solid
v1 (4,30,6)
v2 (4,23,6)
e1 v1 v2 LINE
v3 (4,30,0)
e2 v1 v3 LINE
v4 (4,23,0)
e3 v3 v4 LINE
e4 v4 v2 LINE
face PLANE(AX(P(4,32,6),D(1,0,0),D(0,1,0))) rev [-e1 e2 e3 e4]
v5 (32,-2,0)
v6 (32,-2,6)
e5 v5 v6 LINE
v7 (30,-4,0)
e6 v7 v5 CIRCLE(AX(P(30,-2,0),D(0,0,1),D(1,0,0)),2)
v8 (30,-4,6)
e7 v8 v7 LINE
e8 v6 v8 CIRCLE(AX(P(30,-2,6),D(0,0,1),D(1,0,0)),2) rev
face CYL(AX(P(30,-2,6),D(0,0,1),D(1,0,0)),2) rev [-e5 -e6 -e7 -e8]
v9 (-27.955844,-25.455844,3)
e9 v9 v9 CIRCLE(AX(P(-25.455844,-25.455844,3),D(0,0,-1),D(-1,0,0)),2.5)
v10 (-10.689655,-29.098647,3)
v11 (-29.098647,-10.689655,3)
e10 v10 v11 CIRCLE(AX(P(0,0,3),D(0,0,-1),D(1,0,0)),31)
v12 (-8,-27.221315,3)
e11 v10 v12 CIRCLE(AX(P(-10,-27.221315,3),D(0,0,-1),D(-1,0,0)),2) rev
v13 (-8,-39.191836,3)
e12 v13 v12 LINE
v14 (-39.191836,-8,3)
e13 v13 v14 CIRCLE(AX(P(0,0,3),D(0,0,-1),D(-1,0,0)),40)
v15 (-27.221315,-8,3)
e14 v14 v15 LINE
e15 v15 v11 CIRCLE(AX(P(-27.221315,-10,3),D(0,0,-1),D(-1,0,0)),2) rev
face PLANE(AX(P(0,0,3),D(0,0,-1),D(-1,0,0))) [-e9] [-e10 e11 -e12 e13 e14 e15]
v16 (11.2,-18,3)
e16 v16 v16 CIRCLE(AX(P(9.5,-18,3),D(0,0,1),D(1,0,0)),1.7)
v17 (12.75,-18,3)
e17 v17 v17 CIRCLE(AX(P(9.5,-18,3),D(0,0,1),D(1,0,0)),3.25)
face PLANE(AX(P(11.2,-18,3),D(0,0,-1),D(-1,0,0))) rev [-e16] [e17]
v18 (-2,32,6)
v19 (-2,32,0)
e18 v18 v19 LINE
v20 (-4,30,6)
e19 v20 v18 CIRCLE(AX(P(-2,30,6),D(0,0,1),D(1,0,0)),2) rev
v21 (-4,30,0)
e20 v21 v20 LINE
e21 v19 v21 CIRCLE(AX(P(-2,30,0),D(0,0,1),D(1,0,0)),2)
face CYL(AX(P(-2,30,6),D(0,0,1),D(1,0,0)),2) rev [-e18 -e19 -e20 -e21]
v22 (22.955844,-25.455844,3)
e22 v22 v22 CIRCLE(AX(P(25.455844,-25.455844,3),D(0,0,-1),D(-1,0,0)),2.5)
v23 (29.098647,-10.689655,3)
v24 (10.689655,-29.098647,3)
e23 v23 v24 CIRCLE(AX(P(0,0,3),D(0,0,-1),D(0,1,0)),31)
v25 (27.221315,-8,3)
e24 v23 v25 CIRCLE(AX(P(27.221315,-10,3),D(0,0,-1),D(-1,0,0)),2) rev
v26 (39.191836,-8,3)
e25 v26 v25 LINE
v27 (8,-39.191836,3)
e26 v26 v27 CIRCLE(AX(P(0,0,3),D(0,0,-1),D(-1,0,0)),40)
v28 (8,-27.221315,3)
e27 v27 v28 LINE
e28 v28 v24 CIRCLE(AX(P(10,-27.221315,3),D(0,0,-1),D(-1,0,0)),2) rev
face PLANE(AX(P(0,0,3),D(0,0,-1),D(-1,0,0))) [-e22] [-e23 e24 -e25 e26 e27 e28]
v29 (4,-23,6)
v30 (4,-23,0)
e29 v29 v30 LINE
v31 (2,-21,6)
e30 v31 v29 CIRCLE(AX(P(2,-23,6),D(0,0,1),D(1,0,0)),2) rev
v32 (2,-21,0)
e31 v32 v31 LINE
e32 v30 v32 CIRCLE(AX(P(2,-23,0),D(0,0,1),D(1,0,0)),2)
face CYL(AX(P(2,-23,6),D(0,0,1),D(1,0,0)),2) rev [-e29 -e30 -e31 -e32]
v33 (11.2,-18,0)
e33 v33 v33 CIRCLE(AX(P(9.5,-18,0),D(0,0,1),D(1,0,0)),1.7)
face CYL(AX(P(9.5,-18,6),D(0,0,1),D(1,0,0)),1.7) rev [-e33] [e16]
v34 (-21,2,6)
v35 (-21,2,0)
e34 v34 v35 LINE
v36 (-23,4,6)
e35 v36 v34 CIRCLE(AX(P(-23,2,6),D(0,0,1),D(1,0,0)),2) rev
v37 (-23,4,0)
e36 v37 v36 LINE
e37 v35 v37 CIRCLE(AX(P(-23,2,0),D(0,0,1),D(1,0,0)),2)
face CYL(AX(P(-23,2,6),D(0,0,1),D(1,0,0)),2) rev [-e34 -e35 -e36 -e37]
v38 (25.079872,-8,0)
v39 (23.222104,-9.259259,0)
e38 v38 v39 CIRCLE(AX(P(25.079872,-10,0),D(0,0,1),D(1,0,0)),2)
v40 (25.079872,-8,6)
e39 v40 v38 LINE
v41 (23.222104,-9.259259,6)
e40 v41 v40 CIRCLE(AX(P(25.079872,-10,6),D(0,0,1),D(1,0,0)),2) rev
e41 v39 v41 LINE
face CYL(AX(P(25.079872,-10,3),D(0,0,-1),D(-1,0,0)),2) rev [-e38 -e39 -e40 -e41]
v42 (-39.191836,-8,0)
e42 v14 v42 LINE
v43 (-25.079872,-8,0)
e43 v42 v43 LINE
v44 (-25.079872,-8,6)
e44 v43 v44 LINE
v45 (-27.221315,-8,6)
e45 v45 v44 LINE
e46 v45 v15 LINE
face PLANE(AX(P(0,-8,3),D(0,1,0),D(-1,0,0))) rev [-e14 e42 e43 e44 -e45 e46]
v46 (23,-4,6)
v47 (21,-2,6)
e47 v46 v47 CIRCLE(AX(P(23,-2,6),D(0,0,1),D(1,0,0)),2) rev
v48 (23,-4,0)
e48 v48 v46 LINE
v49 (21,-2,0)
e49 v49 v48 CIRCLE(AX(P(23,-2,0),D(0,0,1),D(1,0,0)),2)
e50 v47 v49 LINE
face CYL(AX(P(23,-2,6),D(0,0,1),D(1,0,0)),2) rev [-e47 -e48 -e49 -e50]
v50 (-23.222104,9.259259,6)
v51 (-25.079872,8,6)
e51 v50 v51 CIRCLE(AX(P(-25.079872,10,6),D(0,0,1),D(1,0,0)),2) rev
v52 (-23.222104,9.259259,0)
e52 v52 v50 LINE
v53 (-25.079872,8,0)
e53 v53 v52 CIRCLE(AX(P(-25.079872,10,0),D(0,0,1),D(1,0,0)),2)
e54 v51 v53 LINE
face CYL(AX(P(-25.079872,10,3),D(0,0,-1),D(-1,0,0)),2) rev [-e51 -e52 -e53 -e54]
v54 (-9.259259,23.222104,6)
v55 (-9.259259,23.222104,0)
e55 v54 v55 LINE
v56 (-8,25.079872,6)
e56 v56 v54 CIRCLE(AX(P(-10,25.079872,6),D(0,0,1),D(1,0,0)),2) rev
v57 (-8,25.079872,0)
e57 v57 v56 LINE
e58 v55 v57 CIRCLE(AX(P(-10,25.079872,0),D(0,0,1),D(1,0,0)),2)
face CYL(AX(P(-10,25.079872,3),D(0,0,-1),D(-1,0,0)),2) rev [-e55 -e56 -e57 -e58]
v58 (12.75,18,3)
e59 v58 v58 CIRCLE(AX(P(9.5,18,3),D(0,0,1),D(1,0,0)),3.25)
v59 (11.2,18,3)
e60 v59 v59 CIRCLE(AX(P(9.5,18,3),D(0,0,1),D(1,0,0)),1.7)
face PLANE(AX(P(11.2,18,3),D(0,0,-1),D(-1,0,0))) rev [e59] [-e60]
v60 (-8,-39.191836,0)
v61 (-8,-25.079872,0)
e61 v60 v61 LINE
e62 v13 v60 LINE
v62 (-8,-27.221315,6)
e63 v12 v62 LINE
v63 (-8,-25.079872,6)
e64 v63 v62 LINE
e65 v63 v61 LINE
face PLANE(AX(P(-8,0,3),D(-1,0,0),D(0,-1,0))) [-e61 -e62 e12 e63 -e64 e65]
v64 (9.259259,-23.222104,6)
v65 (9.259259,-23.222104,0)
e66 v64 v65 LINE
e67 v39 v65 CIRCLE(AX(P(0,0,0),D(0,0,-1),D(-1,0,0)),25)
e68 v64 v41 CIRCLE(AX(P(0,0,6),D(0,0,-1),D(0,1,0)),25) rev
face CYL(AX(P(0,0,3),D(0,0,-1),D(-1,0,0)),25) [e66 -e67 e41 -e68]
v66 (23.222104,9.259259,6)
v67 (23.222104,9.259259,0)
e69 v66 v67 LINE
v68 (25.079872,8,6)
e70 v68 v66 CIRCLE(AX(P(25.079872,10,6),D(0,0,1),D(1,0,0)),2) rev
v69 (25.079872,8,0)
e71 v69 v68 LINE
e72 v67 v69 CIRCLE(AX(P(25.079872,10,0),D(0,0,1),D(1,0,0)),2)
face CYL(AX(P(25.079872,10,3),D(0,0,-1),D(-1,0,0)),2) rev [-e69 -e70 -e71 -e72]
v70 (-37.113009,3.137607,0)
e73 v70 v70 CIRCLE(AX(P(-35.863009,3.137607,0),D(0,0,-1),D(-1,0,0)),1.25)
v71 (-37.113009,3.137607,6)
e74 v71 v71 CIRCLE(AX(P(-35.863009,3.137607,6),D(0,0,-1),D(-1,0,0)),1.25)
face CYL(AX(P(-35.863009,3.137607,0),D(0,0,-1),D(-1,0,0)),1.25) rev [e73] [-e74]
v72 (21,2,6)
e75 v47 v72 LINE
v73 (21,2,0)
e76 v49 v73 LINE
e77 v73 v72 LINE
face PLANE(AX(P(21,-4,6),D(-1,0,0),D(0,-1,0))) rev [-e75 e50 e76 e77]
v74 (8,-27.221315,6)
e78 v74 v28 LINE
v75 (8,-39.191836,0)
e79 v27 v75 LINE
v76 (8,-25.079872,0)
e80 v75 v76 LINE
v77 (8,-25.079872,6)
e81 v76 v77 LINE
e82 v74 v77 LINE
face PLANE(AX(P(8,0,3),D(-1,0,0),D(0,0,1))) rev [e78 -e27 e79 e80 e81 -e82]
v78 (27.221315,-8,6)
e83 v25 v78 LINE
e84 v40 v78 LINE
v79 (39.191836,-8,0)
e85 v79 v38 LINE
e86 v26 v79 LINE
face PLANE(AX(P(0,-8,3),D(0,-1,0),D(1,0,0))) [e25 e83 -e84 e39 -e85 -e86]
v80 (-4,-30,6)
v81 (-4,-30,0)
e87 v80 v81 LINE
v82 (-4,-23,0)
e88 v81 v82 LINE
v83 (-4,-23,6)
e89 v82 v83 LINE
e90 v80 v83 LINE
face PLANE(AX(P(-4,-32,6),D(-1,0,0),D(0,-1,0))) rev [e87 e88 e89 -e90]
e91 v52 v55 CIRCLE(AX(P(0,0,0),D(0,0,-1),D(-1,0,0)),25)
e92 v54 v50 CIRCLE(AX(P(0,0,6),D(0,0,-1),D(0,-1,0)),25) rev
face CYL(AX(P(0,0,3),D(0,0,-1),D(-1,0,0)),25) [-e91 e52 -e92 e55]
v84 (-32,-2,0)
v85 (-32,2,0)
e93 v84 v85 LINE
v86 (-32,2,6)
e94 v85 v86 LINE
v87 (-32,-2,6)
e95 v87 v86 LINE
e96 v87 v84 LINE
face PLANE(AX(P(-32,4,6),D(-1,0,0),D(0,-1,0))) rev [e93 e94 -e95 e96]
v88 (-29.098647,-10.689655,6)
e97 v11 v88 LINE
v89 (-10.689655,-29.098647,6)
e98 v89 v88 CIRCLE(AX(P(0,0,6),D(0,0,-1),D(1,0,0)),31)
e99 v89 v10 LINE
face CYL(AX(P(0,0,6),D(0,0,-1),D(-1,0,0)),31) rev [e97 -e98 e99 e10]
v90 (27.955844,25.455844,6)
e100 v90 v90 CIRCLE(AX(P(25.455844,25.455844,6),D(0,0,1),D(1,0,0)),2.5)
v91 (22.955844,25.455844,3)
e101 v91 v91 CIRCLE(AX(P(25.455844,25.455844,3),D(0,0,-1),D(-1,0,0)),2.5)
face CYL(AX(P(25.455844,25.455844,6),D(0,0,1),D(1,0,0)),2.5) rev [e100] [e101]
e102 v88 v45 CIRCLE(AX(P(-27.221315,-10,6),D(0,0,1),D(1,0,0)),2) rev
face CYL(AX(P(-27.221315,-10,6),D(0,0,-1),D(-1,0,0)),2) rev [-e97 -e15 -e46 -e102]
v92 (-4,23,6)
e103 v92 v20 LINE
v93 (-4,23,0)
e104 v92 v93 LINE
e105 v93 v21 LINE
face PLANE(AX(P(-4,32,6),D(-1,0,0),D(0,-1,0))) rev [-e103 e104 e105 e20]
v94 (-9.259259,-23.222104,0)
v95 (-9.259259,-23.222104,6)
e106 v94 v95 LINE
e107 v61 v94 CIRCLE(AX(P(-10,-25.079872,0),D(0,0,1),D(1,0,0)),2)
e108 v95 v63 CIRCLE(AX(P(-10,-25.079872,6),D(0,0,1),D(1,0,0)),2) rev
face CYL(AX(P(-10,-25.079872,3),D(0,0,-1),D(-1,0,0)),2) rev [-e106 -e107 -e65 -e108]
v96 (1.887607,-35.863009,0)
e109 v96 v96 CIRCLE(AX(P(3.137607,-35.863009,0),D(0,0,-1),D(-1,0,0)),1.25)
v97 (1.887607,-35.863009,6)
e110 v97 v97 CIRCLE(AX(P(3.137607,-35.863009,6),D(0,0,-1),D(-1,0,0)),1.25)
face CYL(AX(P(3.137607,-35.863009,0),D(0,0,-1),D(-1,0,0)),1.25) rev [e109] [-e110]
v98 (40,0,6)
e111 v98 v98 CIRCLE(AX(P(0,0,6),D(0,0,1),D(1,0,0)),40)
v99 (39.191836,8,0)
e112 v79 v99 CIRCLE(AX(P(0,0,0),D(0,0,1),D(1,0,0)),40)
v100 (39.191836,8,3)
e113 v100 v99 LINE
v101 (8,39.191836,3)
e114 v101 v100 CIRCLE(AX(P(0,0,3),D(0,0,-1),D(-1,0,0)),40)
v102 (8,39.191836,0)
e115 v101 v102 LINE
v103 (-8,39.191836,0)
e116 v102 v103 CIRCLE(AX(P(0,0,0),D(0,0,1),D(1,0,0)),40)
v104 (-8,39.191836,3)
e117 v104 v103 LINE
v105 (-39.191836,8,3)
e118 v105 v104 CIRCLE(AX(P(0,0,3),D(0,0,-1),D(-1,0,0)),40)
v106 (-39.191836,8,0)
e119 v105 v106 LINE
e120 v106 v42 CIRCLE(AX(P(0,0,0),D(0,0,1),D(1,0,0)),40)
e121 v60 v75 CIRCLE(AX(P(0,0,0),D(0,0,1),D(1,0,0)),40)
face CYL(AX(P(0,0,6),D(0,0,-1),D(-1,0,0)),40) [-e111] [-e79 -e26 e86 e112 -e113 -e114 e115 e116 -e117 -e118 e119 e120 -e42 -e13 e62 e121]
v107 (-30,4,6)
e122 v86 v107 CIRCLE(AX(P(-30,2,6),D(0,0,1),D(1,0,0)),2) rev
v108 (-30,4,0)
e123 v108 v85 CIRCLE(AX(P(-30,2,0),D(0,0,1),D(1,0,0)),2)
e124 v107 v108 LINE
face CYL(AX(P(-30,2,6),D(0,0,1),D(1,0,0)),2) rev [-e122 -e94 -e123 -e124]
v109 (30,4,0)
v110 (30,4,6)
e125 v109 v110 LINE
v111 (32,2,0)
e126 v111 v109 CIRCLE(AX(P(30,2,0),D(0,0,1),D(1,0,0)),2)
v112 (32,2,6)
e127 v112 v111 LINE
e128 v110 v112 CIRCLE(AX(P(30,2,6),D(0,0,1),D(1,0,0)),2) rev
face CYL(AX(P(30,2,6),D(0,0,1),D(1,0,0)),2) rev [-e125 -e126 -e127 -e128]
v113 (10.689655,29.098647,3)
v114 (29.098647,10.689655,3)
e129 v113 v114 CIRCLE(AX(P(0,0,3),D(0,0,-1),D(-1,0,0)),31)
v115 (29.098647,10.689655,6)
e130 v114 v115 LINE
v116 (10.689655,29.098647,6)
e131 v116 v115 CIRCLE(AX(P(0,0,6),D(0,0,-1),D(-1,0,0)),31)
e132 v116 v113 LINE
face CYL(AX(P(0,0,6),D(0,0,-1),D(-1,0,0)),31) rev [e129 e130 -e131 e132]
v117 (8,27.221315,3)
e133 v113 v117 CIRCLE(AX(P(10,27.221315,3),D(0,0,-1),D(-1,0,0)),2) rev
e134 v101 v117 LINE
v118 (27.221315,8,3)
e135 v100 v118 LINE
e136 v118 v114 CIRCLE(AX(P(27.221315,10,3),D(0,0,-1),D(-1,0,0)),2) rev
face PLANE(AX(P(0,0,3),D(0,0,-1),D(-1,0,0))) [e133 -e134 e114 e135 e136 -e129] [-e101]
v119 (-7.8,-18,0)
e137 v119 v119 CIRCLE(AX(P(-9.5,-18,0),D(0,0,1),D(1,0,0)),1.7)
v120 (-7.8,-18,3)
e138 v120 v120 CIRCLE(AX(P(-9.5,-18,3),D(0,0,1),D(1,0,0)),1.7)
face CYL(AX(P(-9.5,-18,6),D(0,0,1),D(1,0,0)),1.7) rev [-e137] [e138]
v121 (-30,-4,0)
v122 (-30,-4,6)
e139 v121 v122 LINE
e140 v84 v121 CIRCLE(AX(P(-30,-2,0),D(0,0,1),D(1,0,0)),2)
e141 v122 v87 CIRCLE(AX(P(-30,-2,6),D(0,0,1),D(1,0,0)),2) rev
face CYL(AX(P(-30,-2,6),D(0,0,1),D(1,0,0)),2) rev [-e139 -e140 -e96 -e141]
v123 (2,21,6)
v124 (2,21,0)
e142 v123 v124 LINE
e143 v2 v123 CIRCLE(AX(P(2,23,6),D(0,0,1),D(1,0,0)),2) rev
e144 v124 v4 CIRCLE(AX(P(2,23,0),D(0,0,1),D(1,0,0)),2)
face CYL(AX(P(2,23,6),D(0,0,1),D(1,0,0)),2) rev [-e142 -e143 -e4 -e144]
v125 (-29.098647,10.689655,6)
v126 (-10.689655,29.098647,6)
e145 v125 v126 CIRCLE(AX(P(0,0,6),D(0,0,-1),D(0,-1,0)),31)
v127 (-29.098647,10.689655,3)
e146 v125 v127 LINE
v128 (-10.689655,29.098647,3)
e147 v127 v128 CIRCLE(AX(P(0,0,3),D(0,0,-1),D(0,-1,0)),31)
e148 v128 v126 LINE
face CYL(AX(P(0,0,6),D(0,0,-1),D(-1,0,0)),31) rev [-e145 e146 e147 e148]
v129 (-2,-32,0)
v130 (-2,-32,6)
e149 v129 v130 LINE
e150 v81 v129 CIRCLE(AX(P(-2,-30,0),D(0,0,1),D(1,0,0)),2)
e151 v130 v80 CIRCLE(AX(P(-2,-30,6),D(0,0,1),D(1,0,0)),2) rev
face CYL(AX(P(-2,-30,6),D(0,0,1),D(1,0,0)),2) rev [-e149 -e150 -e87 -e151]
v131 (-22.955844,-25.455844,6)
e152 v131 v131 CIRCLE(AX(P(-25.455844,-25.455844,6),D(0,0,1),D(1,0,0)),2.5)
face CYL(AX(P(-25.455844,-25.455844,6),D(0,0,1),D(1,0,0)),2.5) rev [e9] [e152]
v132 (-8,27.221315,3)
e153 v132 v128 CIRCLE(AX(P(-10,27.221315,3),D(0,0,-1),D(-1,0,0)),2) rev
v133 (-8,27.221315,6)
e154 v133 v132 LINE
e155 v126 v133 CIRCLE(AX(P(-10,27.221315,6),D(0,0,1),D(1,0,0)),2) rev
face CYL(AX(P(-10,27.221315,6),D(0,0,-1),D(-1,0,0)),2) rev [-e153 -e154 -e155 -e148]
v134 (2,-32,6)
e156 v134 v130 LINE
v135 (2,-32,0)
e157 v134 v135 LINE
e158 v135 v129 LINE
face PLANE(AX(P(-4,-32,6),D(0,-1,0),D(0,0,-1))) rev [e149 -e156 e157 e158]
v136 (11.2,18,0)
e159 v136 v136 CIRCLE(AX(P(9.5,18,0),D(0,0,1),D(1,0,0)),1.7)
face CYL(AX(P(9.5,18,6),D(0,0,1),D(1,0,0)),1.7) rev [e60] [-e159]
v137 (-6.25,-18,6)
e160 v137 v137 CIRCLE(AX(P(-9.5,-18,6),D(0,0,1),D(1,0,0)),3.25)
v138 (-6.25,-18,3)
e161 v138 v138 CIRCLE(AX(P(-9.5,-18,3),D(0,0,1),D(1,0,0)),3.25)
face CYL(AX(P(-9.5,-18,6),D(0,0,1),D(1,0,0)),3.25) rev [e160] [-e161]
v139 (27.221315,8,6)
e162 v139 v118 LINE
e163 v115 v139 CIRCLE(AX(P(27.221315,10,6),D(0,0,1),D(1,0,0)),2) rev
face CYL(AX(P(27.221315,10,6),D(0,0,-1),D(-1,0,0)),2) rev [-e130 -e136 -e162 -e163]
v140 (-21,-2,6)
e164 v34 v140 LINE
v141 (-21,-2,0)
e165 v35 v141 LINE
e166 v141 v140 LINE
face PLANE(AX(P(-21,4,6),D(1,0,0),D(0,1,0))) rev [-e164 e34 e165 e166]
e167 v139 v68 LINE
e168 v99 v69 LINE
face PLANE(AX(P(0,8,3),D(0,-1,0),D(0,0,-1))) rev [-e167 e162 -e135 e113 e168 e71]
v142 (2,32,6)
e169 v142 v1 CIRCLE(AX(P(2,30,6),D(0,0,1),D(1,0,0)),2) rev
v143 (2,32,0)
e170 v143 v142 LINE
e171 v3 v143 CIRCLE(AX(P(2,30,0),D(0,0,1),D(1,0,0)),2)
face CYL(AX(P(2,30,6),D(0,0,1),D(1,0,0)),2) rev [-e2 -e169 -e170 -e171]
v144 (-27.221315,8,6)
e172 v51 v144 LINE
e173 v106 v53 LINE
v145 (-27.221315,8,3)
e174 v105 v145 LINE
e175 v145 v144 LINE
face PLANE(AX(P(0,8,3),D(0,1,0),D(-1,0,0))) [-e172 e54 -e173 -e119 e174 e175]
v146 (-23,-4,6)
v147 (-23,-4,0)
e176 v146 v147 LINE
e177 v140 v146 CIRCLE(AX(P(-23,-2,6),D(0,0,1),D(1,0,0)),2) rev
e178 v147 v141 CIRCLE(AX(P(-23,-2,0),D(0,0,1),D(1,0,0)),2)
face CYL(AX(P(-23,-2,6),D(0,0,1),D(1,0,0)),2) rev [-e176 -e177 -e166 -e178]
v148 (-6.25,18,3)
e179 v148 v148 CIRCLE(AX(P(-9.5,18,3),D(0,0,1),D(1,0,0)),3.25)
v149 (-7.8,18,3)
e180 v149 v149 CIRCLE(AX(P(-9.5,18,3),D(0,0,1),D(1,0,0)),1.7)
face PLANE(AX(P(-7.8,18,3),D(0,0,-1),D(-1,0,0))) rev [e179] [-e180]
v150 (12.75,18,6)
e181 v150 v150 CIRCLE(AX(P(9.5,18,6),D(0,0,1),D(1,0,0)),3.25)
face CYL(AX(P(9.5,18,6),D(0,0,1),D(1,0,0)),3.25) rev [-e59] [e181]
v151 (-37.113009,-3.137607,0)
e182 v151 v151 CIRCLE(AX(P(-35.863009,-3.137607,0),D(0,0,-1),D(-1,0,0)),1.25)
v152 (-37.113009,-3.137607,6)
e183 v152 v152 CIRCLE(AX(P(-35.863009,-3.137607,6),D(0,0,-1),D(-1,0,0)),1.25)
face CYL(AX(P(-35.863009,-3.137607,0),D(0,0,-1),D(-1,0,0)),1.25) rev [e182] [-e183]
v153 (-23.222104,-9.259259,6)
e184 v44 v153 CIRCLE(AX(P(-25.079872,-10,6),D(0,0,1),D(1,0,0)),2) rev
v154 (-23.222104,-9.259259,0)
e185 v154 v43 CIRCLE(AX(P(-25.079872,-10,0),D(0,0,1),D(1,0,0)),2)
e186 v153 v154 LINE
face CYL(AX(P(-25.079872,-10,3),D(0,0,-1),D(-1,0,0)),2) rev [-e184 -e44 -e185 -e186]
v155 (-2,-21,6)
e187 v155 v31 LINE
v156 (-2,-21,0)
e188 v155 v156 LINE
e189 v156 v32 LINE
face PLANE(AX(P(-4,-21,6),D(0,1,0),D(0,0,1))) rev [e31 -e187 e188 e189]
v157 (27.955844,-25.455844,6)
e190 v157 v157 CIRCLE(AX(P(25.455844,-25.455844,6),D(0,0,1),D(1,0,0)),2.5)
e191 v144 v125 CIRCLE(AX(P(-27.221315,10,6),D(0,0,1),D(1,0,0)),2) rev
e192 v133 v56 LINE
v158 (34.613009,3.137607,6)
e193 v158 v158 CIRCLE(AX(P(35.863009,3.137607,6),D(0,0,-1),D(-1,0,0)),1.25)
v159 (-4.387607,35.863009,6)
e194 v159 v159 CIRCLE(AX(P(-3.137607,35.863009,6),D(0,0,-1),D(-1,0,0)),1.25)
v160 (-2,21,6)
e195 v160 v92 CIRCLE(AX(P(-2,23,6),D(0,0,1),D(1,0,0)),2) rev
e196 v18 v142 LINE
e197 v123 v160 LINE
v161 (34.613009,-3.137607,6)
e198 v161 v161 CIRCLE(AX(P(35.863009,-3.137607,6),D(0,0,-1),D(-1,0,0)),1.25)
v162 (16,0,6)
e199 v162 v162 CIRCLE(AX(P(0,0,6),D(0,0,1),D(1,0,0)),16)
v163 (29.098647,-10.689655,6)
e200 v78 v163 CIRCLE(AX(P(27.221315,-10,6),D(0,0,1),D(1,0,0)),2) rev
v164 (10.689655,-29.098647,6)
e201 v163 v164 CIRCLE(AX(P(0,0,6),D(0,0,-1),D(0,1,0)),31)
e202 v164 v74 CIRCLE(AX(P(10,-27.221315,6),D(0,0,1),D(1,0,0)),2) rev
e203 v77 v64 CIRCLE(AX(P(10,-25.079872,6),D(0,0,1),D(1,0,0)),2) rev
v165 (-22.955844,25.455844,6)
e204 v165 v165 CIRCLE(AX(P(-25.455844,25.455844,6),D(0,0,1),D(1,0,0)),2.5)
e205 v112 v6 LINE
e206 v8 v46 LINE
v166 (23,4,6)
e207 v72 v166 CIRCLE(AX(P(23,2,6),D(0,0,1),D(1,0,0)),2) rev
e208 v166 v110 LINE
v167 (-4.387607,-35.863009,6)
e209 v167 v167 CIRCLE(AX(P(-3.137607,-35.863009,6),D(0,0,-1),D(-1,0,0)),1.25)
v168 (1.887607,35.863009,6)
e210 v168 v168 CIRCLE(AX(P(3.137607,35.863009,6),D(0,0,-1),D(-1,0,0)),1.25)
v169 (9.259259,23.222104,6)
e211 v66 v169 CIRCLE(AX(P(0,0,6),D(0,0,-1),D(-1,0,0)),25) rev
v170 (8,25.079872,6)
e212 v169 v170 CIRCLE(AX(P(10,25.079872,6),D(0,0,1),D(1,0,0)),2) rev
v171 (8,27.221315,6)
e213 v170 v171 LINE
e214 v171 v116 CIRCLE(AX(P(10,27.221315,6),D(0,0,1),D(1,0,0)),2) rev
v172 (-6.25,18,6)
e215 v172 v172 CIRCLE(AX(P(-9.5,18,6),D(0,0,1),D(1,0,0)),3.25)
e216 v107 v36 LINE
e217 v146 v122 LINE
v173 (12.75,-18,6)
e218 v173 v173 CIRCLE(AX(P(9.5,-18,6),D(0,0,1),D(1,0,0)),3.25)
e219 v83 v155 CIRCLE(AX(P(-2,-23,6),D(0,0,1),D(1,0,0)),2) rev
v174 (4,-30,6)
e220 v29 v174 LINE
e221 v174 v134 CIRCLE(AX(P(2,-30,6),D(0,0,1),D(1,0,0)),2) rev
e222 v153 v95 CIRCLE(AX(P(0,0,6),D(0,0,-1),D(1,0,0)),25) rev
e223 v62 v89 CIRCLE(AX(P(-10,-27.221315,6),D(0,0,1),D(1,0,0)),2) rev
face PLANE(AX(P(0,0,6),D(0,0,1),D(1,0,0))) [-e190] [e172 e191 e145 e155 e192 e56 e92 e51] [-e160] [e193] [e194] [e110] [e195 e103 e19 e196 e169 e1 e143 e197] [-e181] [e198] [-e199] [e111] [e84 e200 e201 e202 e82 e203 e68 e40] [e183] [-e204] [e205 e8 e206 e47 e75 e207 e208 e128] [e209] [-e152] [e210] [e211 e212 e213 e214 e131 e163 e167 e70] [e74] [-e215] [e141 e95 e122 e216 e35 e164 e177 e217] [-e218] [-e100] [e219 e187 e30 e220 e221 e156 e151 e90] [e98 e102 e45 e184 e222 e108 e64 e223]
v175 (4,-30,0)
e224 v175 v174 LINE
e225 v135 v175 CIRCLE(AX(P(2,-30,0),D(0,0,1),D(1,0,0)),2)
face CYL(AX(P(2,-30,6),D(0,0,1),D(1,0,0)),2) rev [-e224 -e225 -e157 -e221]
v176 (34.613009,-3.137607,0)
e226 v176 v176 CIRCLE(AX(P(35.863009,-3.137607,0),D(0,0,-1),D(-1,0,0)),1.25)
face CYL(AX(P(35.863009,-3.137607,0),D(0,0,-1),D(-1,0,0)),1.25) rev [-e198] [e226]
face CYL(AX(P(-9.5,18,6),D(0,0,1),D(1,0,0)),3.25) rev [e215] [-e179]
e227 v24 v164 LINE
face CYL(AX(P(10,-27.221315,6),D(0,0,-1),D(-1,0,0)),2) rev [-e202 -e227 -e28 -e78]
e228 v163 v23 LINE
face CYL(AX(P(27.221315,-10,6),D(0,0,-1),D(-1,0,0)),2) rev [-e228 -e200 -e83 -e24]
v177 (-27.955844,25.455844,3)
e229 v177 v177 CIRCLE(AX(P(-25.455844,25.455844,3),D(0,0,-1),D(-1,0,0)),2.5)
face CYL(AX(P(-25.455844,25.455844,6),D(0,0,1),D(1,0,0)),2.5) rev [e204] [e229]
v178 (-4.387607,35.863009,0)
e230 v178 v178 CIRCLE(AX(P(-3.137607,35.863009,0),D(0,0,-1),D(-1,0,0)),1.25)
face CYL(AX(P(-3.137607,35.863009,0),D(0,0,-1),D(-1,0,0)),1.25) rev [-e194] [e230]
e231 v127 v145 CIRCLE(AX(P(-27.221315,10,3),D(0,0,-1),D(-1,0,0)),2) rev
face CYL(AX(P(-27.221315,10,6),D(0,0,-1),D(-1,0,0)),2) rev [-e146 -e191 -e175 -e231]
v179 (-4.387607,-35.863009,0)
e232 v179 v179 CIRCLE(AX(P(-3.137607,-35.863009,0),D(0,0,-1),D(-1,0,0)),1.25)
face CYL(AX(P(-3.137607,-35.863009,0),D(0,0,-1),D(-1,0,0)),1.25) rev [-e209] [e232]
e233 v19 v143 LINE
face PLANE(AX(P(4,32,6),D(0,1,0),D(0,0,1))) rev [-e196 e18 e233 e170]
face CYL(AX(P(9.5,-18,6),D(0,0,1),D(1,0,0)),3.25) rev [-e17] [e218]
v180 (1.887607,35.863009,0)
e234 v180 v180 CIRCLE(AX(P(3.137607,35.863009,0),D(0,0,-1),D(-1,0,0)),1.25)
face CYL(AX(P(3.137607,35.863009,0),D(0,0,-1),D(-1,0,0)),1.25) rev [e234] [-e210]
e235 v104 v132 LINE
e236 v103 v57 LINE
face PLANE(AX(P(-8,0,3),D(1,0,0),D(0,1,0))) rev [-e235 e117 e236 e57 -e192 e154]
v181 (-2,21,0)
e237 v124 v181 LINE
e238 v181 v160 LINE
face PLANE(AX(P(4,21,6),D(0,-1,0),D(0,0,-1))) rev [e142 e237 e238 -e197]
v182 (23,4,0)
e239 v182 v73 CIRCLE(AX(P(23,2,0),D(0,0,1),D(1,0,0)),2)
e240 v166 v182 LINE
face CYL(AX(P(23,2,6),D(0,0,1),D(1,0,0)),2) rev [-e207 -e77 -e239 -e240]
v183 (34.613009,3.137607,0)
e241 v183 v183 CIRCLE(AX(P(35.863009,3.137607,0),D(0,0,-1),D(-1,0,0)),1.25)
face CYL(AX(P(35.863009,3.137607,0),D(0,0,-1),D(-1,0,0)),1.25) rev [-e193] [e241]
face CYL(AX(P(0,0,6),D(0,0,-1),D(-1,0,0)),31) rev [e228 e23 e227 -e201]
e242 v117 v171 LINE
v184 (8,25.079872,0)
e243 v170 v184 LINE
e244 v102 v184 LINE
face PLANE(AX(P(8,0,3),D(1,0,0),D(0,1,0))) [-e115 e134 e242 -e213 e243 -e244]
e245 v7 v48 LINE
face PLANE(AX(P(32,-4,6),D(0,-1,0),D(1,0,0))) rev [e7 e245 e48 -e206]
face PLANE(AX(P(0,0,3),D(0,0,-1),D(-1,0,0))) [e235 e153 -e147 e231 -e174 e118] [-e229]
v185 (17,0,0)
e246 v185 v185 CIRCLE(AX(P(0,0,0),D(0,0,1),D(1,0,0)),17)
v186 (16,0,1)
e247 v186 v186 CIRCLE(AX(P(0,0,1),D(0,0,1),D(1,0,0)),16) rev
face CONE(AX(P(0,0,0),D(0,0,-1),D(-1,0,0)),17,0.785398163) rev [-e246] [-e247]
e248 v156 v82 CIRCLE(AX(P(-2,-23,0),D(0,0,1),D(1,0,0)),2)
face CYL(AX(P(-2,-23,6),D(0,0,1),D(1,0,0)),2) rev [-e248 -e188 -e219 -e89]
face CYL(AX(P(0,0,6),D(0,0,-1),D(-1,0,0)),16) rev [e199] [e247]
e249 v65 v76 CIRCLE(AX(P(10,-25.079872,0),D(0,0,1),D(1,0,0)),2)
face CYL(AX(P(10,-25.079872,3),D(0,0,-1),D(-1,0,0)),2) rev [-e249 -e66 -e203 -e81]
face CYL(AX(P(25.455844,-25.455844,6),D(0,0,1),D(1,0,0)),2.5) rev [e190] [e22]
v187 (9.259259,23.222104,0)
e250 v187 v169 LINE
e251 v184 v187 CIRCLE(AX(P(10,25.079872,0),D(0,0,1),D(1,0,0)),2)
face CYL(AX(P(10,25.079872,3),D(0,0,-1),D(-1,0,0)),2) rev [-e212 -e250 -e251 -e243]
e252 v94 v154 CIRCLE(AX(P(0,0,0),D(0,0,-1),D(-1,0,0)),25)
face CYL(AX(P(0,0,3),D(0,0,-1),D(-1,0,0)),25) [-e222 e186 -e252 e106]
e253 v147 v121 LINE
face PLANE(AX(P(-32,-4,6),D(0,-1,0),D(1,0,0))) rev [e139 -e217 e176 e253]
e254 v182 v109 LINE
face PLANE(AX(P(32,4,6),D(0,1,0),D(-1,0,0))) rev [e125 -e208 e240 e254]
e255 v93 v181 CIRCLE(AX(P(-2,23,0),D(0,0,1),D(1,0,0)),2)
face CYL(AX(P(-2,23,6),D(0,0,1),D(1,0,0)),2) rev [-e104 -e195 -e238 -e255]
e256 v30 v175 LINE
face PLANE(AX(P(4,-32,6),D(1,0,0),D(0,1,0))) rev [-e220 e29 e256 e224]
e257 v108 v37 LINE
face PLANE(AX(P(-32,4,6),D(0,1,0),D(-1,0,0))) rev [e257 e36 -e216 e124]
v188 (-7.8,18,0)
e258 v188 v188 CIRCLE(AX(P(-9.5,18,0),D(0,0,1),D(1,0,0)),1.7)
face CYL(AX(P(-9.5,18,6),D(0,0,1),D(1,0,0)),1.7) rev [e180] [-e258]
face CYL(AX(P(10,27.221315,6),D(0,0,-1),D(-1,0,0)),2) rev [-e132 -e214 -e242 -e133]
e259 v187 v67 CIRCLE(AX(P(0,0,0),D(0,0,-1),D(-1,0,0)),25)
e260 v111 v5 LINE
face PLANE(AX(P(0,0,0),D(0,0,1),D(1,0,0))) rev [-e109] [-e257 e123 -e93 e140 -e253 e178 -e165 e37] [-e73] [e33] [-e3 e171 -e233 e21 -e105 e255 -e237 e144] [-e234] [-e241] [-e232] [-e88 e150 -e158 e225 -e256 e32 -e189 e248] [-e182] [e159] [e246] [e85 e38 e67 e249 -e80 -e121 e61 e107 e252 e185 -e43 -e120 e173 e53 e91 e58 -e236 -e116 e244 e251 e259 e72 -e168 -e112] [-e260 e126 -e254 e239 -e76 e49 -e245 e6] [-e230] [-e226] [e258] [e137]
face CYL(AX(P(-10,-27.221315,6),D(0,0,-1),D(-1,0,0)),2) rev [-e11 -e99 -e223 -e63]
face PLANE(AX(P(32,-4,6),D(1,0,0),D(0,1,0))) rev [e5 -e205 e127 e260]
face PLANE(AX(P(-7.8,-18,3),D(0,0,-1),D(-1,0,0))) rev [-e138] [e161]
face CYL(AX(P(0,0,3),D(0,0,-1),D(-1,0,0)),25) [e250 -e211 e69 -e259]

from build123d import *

# Parameters (mm, degrees)
SKETCH2_R             = 40
SKETCH2_R_2           = 16
BOSS_EXTRUDE1_DEPTH   = 6
CUT_EXTRUDE1_DEPTH    = 3
M3X0_5_TAPPED_HOLE1_D = 2.5
CIRPATTERN1_COUNT     = 4
CHAMFER1_SIZE         = 1
HOLE1_D               = 3.4
HOLE1_CBORE_D         = 6.5
HOLE1_CBORE_DEPTH     = 3
CUT_EXTRUDE2_DEPTH    = 57.648036153
SKETCH11_W            = 8
SKETCH11_H            = 11
CUT_EXTRUDE3_DEPTH    = 57.885850613
FILLET1_R             = 2
FILLET2_R             = 2
CIRPATTERN2_DEPTH     = 6
M4_CLEARANCE_HOLE1_D  = 5
CIRPATTERN3_COUNT     = 4
FILLET3_R             = 2


# Read off the part's stored shape, not the designer's step: CirPattern2
with BuildPart() as part:
    # Sketch2 → Boss-Extrude1 (new body)
    with BuildSketch(Plane.XY):
        Circle(SKETCH2_R)
        Circle(SKETCH2_R_2, mode=Mode.SUBTRACT)
    extrude(amount=BOSS_EXTRUDE1_DEPTH)

    # Sketch3 → Cut-Extrude1 (cut)
    with BuildSketch(Plane(origin=(0, 0, 0), x_dir=(-1, 0, 0), z_dir=(0, 0, -1))):
        with BuildLine():
            Line((-8, 23.685438565), (-8, 41.112910233))
            ThreePointArc((-8, 41.112910233), (-29.61647673, 29.61647673), (-41.112910233, 8))
            Line((-41.112910233, 8), (-23.685438565, 8))
            ThreePointArc((-23.685438565, 8), (-17.67766953, 17.67766953), (-8, 23.685438565))
        make_face()
        with BuildLine():
            ThreePointArc((41.112910233, 8), (29.61647673, 29.61647673), (8, 41.112910233))
            Line((8, 41.112910233), (8, 23.685438565))
            ThreePointArc((8, 23.685438565), (17.67766953, 17.67766953), (23.685438565, 8))
            Line((23.685438565, 8), (41.112910233, 8))
        make_face()
        with BuildLine():
            Line((-23.685438565, -8), (-41.112910233, -8))
            ThreePointArc((-41.112910233, -8), (-29.61647673, -29.61647673), (-8, -41.112910233))
            Line((-8, -41.112910233), (-8, -23.685438565))
            ThreePointArc((-8, -23.685438565), (-17.67766953, -17.67766953), (-23.685438565, -8))
        make_face()
        with BuildLine():
            ThreePointArc((8, -41.112910233), (29.61647673, -29.61647673), (41.112910233, -8))
            Line((41.112910233, -8), (23.685438565, -8))
            ThreePointArc((23.685438565, -8), (17.67766953, -17.67766953), (8, -23.685438565))
            Line((8, -23.685438565), (8, -41.112910233))
        make_face()
    extrude(amount=-CUT_EXTRUDE1_DEPTH, mode=Mode.SUBTRACT)

    # M3x0.5 Tapped Hole1 (through all)
    with Locations(Plane(origin=(0, 0, 0), x_dir=(-1, 0, 0), z_dir=(0, 0, -1))):
        with Locations((-3.137606739, 35.863009131), (3.137606739, 35.863009131)):
            m3x0_5_tapped_hole1 = Hole(M3X0_5_TAPPED_HOLE1_D / 2)

    # CirPattern1: M3x0.5 Tapped Hole1 ×4 about axis
    cirpattern1_axis = Axis((0, 0, 0), (0, 0, 1))
    for i in range(1, CIRPATTERN1_COUNT):
        add(m3x0_5_tapped_hole1.rotate(cirpattern1_axis, i * 360 / CIRPATTERN1_COUNT), mode=Mode.SUBTRACT)

    # Chamfer1
    chamfer1_edges = [part.edges().sort_by_distance(p)[0] for p in [
        (-16, 0, 0),
    ]]
    chamfer(chamfer1_edges, length=CHAMFER1_SIZE)

    # Hole1 (through all)
    with Locations(Plane.XY.offset(6)):
        with Locations((-9.5, 18), (9.5, 18), (-9.5, -18), (9.5, -18)):
            CounterBoreHole(HOLE1_D / 2, HOLE1_CBORE_D / 2, HOLE1_CBORE_DEPTH)

    # Sketch10 → Cut-Extrude2 (cut, through all)
    with BuildSketch(Plane(origin=(0, 0, 3), x_dir=(-1, 0, 0), z_dir=(0, 0, -1))):
        with BuildLine():
            Line((-29.949958264, 8), (-23.685438565, 8))
            ThreePointArc((-23.685438565, 8), (-17.67766953, 17.67766953), (-8, 23.685438565))
            Line((-8, 23.685438565), (-8, 29.949958264))
            ThreePointArc((-8, 29.949958264), (-21.920310217, 21.920310217), (-29.949958264, 8))
        make_face()
    extrude(amount=-CUT_EXTRUDE2_DEPTH, mode=Mode.SUBTRACT)

    # Sketch11 → Cut-Extrude3 (cut, through all)
    with BuildSketch(Plane(origin=(0, 0, 0), x_dir=(-1, 0, 0), z_dir=(0, 0, -1))):
        with Locations((0, 26.5)):
            Rectangle(SKETCH11_W, SKETCH11_H)
    extrude(amount=-CUT_EXTRUDE3_DEPTH, mode=Mode.SUBTRACT)

    # Fillet1
    fillet1_edges = [part.edges().sort_by_distance(p)[0] for p in [
        (4, 21, 3),
        (4, 32, 3),
        (-4, 32, 3),
        (-4, 21, 3),
    ]]
    fillet(fillet1_edges, radius=FILLET1_R)

    # Fillet2
    fillet2_edges = [part.edges().sort_by_distance(p)[0] for p in [
        (8, 29.949958264, 4.5),
        (29.949958264, 8, 4.5),
        (8, 23.685438565, 3),
        (23.685438565, 8, 3),
    ]]
    fillet(fillet2_edges, radius=FILLET2_R)

    # CirPattern2 outline → CirPattern2 (cut)
    with BuildSketch(Plane.XY):
        with BuildLine():
            Line((-27.221315178, 8), (-23.685438565, 8))
            ThreePointArc((-23.685438565, 8), (-17.67766953, 17.67766953), (-8, 23.685438565))
            Line((-8, 23.685438565), (-8, 27.221315178))
            ThreePointArc((-8, 27.221315178), (-8.855297057, 28.861331998), (-10.689655172, 29.098647259))
            ThreePointArc((-10.689655172, 29.098647259), (-21.920310217, 21.920310217), (-29.098647259, 10.689655172))
            ThreePointArc((-29.098647259, 10.689655172), (-28.861331998, 8.855297057), (-27.221315178, 8))
        make_face()
        with BuildLine():
            Line((-8, -27.221315178), (-8, -23.685438565))
            ThreePointArc((-8, -23.685438565), (-17.67766953, -17.67766953), (-23.685438565, -8))
            Line((-23.685438565, -8), (-27.221315178, -8))
            ThreePointArc((-27.221315178, -8), (-28.861331998, -8.855297057), (-29.098647259, -10.689655172))
            ThreePointArc((-29.098647259, -10.689655172), (-21.920310217, -21.920310217), (-10.689655172, -29.098647259))
            ThreePointArc((-10.689655172, -29.098647259), (-8.855297057, -28.861331998), (-8, -27.221315178))
        make_face()
        with BuildLine():
            Line((27.221315178, -8), (23.685438565, -8))
            ThreePointArc((23.685438565, -8), (17.67766953, -17.67766953), (8, -23.685438565))
            Line((8, -23.685438565), (8, -27.221315178))
            ThreePointArc((8, -27.221315178), (8.855297057, -28.861331998), (10.689655172, -29.098647259))
            ThreePointArc((10.689655172, -29.098647259), (21.920310217, -21.920310217), (29.098647259, -10.689655172))
            ThreePointArc((29.098647259, -10.689655172), (28.861331998, -8.855297057), (27.221315178, -8))
        make_face()
        with BuildLine():
            ThreePointArc((2, -32), (3.414213562, -31.414213562), (4, -30))
            Line((4, -30), (4, -23))
            ThreePointArc((4, -23), (3.414213562, -21.585786438), (2, -21))
            Line((2, -21), (-2, -21))
            ThreePointArc((-2, -21), (-3.414213562, -21.585786438), (-4, -23))
            Line((-4, -23), (-4, -30))
            ThreePointArc((-4, -30), (-3.414213562, -31.414213562), (-2, -32))
            Line((-2, -32), (2, -32))
        make_face()
        with BuildLine():
            ThreePointArc((-21, 2), (-21.585786438, 3.414213562), (-23, 4))
            Line((-23, 4), (-30, 4))
            ThreePointArc((-30, 4), (-31.414213562, 3.414213562), (-32, 2))
            Line((-32, 2), (-32, -2))
            ThreePointArc((-32, -2), (-31.414213562, -3.414213562), (-30, -4))
            Line((-30, -4), (-23, -4))
            ThreePointArc((-23, -4), (-21.585786438, -3.414213562), (-21, -2))
            Line((-21, -2), (-21, 2))
        make_face()
        with BuildLine():
            ThreePointArc((32, 2), (31.414213562, 3.414213562), (30, 4))
            Line((30, 4), (23, 4))
            ThreePointArc((23, 4), (21.585786438, 3.414213562), (21, 2))
            Line((21, 2), (21, -2))
            ThreePointArc((21, -2), (21.585786438, -3.414213562), (23, -4))
            Line((23, -4), (30, -4))
            ThreePointArc((30, -4), (31.414213562, -3.414213562), (32, -2))
            Line((32, -2), (32, 2))
        make_face()
    extrude(amount=CIRPATTERN2_DEPTH, mode=Mode.SUBTRACT)

    # M4 Clearance Hole1 (through all)
    with Locations(Plane.XY.offset(6)):
        with Locations((-25.455844123, 25.455844123)):
            m4_clearance_hole1 = Hole(M4_CLEARANCE_HOLE1_D / 2)

    # CirPattern3: M4 Clearance Hole1 ×4 about axis
    cirpattern3_axis = Axis((0, 0, 0), (0, 0, 1))
    for i in range(1, CIRPATTERN3_COUNT):
        add(m4_clearance_hole1.rotate(cirpattern3_axis, i * 360 / CIRPATTERN3_COUNT), mode=Mode.SUBTRACT)

    # Fillet3
    fillet3_edges = [part.edges().sort_by_distance(p)[0] for p in [
        (23.685438565, -8, 1.5),
        (8, -23.685438565, 1.5),
        (-8, -23.685438565, 1.5),
        (-23.685438565, -8, 1.5),
        (-23.685438565, 8, 1.5),
        (-8, 23.685438565, 1.5),
    ]]
    fillet(fillet3_edges, radius=FILLET3_R)


solid = part.part
